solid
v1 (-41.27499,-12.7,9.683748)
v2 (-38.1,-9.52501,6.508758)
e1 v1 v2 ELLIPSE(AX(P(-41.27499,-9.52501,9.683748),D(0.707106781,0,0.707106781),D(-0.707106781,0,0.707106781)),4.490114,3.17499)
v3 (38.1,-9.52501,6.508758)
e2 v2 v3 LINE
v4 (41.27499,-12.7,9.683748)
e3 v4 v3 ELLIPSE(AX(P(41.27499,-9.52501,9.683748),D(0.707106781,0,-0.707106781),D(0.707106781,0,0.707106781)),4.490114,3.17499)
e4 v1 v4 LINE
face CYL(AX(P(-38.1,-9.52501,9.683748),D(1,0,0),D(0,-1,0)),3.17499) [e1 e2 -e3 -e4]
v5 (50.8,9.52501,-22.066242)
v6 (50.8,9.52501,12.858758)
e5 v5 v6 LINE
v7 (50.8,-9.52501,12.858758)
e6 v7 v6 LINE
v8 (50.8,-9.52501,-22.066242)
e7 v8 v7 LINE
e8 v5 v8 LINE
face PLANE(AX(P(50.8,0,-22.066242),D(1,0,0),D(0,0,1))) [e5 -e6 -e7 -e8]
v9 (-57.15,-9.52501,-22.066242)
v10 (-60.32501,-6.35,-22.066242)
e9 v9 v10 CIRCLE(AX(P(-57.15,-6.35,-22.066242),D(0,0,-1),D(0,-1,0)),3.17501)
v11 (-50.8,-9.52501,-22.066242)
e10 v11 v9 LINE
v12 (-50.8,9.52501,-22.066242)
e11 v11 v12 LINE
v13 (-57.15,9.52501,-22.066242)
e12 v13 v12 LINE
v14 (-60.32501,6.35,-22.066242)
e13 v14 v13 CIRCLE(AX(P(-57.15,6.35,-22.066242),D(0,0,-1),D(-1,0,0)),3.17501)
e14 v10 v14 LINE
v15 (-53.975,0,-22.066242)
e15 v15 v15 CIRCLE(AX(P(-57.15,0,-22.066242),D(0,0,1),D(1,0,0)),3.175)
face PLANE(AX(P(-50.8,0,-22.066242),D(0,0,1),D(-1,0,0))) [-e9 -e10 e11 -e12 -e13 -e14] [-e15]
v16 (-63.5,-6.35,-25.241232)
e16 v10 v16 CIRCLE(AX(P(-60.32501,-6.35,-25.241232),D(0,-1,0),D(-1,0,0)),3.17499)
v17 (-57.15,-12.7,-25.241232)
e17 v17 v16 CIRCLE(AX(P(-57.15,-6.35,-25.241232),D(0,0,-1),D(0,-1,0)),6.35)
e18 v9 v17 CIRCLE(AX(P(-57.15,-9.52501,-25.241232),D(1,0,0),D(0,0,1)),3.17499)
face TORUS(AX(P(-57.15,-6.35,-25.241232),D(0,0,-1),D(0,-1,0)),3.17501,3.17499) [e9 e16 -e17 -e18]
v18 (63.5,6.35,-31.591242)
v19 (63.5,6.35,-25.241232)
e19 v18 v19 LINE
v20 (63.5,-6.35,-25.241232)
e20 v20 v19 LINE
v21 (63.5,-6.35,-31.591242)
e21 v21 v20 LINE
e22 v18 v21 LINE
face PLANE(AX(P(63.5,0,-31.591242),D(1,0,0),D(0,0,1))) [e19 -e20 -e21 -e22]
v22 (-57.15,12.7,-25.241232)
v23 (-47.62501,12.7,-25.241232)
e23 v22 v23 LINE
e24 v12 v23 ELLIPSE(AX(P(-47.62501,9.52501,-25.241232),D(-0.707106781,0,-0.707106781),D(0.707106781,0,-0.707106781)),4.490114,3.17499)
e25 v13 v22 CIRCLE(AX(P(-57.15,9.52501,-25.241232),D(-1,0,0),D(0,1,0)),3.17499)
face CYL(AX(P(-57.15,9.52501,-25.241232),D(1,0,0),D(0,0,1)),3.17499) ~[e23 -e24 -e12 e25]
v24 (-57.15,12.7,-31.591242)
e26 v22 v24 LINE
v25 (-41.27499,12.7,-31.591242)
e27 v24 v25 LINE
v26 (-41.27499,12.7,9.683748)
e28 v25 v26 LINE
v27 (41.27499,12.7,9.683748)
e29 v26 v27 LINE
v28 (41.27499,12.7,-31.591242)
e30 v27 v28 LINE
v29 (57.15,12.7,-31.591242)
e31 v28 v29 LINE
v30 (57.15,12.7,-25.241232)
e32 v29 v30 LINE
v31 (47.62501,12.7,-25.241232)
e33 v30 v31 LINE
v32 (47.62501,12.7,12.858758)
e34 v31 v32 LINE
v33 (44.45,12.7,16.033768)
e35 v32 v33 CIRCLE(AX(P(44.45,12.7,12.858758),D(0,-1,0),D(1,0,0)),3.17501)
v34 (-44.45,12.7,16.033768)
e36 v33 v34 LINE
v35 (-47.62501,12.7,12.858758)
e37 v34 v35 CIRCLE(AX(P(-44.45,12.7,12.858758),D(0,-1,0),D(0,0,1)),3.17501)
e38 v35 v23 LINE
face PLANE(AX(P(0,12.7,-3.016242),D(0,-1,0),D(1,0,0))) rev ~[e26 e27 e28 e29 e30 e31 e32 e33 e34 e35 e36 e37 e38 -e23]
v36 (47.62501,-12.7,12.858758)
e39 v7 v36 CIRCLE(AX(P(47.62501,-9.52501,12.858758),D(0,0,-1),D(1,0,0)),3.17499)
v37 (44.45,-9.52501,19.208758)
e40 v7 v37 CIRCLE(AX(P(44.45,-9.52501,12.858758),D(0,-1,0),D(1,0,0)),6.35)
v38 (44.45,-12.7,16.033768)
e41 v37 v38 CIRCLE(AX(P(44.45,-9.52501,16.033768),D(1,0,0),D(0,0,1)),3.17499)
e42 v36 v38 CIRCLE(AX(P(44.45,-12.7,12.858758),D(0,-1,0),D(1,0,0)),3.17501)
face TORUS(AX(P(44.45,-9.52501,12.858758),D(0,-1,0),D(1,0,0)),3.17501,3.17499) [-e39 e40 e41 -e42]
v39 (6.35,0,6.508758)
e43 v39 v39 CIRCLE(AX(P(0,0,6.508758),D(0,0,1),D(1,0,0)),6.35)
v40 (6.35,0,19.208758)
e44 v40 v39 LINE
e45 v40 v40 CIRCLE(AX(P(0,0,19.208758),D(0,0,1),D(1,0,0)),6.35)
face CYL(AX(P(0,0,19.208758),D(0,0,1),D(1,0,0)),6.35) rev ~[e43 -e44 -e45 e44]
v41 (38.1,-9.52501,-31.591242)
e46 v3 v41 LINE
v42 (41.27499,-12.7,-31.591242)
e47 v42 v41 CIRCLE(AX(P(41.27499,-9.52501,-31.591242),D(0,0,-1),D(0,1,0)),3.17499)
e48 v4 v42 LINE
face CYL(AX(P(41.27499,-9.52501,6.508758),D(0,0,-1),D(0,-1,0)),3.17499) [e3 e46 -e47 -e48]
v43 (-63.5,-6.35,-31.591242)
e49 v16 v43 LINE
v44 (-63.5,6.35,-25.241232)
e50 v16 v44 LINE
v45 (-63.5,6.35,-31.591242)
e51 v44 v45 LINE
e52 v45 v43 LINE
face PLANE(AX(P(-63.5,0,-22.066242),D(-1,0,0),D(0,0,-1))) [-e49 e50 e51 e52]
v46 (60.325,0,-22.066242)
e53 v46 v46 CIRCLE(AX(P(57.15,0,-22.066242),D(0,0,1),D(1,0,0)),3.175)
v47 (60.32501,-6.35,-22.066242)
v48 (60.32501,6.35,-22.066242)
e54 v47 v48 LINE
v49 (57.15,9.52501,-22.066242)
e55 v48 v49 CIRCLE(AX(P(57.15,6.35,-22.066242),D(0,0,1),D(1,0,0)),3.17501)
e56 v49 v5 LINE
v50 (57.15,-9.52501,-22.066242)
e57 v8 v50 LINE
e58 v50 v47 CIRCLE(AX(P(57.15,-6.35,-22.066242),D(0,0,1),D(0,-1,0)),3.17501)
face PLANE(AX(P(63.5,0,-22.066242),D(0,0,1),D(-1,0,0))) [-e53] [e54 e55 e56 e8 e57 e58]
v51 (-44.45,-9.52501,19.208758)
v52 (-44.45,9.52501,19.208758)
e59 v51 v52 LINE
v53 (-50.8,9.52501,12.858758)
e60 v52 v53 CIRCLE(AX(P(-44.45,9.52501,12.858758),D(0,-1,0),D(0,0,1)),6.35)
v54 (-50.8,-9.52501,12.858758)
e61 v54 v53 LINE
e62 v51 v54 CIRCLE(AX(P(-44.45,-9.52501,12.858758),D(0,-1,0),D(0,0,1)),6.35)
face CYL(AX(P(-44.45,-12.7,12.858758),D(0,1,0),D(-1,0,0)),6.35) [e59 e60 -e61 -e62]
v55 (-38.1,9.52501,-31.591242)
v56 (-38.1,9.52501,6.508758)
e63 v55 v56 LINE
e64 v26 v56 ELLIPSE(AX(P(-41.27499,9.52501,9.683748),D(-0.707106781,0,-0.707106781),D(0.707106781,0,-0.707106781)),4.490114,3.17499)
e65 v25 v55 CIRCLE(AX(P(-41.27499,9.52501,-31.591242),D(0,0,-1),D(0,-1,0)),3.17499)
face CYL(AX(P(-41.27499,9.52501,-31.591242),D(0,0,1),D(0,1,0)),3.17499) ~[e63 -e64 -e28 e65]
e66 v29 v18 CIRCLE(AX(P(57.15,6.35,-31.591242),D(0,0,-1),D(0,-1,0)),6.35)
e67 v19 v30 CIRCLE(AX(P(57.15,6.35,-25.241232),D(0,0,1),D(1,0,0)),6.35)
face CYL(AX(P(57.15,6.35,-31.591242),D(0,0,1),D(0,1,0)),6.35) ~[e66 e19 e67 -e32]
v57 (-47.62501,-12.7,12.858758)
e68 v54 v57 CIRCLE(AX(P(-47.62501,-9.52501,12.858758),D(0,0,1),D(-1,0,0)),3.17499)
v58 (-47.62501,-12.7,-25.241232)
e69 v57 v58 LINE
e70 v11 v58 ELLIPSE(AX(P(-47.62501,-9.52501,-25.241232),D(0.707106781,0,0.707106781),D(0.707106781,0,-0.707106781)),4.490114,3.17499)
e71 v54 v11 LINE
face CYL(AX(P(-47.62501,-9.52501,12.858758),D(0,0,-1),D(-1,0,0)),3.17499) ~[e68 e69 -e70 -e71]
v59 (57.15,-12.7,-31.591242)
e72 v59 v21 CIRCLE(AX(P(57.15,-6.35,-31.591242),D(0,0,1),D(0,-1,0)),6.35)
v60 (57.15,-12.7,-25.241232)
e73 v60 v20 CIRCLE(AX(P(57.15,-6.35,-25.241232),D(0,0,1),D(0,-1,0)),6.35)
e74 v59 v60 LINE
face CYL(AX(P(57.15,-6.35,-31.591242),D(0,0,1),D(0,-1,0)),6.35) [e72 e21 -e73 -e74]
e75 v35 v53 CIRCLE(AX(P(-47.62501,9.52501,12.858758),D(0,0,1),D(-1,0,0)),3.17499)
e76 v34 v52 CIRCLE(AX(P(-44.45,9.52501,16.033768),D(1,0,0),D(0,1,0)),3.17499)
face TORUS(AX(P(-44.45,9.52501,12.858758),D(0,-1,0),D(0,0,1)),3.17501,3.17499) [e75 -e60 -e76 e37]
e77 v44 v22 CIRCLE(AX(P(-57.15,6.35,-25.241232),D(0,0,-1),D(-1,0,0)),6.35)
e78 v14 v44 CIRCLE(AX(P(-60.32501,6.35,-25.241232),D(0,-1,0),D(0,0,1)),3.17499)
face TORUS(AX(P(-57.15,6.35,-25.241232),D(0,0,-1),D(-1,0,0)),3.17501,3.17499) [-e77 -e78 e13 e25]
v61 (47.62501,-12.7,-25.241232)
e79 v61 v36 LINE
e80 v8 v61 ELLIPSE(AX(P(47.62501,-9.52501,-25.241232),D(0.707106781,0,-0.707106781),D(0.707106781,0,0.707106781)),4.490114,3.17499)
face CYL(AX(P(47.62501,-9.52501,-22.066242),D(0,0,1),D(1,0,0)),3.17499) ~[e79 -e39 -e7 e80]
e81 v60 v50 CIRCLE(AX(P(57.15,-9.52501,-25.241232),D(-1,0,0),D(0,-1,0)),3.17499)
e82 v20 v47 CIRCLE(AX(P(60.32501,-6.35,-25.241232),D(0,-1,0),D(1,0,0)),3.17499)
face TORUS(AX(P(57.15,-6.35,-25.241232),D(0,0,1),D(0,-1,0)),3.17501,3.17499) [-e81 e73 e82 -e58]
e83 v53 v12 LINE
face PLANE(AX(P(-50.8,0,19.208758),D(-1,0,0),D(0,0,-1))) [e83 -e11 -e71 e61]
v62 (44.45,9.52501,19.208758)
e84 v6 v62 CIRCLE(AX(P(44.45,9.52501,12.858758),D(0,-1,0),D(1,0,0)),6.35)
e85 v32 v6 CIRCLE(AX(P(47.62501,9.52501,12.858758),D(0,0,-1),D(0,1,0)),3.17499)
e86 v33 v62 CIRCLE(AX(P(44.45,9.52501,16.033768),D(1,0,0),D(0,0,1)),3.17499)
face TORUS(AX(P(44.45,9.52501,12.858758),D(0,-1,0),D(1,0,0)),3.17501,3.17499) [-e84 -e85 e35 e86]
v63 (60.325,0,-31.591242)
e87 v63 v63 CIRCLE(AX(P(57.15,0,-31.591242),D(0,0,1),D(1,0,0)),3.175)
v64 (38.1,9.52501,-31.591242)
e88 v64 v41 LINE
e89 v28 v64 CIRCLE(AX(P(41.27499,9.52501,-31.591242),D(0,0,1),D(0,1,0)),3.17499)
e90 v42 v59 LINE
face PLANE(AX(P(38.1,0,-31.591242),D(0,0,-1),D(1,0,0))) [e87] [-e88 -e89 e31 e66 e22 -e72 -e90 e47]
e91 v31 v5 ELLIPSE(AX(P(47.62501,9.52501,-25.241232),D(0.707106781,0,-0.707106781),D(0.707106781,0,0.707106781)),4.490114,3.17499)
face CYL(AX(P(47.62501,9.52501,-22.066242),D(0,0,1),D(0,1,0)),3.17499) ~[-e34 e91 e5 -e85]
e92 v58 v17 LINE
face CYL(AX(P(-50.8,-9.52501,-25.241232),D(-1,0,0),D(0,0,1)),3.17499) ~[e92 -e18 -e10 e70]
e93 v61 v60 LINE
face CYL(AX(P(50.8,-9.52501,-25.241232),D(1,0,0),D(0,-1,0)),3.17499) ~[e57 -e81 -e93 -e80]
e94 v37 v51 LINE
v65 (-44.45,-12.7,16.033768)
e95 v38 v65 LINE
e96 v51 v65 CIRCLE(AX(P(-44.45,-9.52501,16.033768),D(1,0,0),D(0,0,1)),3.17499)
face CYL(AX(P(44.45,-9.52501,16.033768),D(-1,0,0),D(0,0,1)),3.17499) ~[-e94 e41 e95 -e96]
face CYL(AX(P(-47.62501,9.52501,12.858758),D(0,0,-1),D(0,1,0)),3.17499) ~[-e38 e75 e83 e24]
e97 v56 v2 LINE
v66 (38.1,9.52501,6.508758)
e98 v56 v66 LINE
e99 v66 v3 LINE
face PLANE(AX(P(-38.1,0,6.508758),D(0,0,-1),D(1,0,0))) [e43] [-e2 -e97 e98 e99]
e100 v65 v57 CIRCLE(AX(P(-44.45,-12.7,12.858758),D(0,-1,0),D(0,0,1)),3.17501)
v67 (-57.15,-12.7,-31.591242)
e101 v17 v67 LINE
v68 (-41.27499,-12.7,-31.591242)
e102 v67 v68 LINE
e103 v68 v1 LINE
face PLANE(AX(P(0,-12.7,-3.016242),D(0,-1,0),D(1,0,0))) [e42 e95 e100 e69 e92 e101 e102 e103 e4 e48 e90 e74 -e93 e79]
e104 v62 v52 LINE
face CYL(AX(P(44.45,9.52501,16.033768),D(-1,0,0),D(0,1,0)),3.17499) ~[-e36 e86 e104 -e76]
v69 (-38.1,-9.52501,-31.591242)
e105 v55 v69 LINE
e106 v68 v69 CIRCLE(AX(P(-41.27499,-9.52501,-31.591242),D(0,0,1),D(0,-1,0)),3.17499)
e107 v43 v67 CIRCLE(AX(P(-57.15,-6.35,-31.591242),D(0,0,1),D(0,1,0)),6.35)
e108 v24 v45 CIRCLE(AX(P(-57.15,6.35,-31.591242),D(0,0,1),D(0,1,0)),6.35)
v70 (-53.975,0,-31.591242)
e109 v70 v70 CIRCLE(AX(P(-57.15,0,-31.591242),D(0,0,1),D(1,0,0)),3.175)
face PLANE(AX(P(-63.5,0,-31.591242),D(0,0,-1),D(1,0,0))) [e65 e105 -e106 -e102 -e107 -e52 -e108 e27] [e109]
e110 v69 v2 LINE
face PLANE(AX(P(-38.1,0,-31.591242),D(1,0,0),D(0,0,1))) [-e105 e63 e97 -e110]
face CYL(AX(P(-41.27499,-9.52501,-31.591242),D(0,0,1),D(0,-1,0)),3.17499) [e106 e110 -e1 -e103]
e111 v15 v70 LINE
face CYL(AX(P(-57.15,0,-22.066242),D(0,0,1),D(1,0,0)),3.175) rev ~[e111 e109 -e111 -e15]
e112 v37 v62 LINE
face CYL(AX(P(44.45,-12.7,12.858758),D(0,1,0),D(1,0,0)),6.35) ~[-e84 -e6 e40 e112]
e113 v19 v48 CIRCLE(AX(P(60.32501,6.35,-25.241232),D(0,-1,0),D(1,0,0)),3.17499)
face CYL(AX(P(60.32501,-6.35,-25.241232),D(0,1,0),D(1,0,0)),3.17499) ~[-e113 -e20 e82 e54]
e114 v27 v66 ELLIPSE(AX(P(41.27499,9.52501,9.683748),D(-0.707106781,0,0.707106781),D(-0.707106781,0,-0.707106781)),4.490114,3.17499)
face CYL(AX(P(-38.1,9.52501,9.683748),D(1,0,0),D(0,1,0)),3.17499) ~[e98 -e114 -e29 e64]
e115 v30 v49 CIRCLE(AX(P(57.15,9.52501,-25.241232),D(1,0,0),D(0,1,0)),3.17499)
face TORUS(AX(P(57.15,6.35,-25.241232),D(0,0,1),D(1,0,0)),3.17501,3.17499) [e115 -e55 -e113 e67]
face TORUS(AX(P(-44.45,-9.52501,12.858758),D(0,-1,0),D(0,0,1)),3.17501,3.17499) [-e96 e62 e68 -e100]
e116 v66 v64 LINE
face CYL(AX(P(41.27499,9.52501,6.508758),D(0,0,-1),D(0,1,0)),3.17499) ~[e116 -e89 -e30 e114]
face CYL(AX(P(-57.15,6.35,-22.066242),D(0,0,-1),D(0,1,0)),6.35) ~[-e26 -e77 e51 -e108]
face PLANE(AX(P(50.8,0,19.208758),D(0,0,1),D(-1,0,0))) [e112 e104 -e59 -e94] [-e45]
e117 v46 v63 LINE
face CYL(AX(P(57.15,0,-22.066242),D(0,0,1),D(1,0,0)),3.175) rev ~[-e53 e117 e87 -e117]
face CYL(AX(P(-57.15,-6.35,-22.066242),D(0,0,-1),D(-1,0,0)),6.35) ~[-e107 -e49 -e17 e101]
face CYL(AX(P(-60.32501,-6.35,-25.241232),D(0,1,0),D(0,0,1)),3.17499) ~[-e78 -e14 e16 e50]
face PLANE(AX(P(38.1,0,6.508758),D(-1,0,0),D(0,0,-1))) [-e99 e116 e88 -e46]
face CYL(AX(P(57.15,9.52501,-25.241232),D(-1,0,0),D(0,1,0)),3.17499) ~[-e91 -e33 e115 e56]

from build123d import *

# Parameters (mm, degrees)
F1_DEPTH = 12.7
F2_R     = 3.175
F3_DEPTH = 9.526
F4_R     = 6.35
F5_DEPTH = 50.801
F6_R     = 6.35
F7_R     = 3.17499


# Not quite as in the source:
# - a fillet or chamfer is up to 0.001 mm smaller than in the source, because OpenCascade refuses the exact size


with BuildPart() as f1:
    # F0 (on Front) → F1 (new body, symmetric)
    with BuildSketch(Plane.XZ):
        Polygon((-50.8, -22.066242151), (-63.5, -22.066242151), (-63.5, -31.591242151), (-38.1, -31.591242151), (-38.1, 6.508757849), (0, 6.508757849), (38.1, 6.508757849), (38.1, -31.591242151), (63.5, -31.591242151), (63.5, -22.066242151), (50.8, -22.066242151), (50.8, 19.208757849), (0, 19.208757849), (-50.8, 19.208757849), align=None)
    extrude(amount=F1_DEPTH, both=True)

    # F2 (on face) → F3 (cut, through all)
    with BuildSketch(Plane.XY.offset(-22.066242151)):
        with Locations((-57.15, 0)):
            Circle(F2_R)
        with Locations((57.15, 0)):
            Circle(F2_R)
    extrude(amount=-F3_DEPTH, mode=Mode.SUBTRACT)

    # F4 (on face) → F5 (cut, through all)
    with BuildSketch(Plane.XY.offset(19.208757849)):
        Circle(F4_R)
    extrude(amount=-F5_DEPTH, mode=Mode.SUBTRACT)

    # F6
    f6_edges = [f1.edges().sort_by_distance(p)[0] for p in [
        (-50.8, 0, 19.208758),
        (50.8, 0, 19.208758),
        (-63.5, -12.7, -26.828742),
        (63.5, -12.7, -26.828742),
        (63.5, 12.7, -26.828742),
        (-63.5, 12.7, -26.828742),
    ]]
    fillet(f6_edges, radius=F6_R)

    # F7 (radius 3.175 in the source; OpenCascade refuses exactly that, so slightly less here)
    f7_edges = [f1.edges().sort_by_distance(p)[0] for p in [
        (-50.8, -12.7, -4.603742),
        (-53.975, -12.7, -22.066242),
        (-38.1, -12.7, -12.541242),
        (0, -12.7, 6.508758),
        (38.1, -12.7, -12.541242),
        (50.8, 12.7, -4.603742),
        (53.975, 12.7, -22.066242),
        (38.1, 12.7, -12.541242),
        (0, 12.7, 6.508758),
        (-38.1, 12.7, -12.541242),
    ]]
    fillet(f7_edges, radius=F7_R)


solid = f1.part
